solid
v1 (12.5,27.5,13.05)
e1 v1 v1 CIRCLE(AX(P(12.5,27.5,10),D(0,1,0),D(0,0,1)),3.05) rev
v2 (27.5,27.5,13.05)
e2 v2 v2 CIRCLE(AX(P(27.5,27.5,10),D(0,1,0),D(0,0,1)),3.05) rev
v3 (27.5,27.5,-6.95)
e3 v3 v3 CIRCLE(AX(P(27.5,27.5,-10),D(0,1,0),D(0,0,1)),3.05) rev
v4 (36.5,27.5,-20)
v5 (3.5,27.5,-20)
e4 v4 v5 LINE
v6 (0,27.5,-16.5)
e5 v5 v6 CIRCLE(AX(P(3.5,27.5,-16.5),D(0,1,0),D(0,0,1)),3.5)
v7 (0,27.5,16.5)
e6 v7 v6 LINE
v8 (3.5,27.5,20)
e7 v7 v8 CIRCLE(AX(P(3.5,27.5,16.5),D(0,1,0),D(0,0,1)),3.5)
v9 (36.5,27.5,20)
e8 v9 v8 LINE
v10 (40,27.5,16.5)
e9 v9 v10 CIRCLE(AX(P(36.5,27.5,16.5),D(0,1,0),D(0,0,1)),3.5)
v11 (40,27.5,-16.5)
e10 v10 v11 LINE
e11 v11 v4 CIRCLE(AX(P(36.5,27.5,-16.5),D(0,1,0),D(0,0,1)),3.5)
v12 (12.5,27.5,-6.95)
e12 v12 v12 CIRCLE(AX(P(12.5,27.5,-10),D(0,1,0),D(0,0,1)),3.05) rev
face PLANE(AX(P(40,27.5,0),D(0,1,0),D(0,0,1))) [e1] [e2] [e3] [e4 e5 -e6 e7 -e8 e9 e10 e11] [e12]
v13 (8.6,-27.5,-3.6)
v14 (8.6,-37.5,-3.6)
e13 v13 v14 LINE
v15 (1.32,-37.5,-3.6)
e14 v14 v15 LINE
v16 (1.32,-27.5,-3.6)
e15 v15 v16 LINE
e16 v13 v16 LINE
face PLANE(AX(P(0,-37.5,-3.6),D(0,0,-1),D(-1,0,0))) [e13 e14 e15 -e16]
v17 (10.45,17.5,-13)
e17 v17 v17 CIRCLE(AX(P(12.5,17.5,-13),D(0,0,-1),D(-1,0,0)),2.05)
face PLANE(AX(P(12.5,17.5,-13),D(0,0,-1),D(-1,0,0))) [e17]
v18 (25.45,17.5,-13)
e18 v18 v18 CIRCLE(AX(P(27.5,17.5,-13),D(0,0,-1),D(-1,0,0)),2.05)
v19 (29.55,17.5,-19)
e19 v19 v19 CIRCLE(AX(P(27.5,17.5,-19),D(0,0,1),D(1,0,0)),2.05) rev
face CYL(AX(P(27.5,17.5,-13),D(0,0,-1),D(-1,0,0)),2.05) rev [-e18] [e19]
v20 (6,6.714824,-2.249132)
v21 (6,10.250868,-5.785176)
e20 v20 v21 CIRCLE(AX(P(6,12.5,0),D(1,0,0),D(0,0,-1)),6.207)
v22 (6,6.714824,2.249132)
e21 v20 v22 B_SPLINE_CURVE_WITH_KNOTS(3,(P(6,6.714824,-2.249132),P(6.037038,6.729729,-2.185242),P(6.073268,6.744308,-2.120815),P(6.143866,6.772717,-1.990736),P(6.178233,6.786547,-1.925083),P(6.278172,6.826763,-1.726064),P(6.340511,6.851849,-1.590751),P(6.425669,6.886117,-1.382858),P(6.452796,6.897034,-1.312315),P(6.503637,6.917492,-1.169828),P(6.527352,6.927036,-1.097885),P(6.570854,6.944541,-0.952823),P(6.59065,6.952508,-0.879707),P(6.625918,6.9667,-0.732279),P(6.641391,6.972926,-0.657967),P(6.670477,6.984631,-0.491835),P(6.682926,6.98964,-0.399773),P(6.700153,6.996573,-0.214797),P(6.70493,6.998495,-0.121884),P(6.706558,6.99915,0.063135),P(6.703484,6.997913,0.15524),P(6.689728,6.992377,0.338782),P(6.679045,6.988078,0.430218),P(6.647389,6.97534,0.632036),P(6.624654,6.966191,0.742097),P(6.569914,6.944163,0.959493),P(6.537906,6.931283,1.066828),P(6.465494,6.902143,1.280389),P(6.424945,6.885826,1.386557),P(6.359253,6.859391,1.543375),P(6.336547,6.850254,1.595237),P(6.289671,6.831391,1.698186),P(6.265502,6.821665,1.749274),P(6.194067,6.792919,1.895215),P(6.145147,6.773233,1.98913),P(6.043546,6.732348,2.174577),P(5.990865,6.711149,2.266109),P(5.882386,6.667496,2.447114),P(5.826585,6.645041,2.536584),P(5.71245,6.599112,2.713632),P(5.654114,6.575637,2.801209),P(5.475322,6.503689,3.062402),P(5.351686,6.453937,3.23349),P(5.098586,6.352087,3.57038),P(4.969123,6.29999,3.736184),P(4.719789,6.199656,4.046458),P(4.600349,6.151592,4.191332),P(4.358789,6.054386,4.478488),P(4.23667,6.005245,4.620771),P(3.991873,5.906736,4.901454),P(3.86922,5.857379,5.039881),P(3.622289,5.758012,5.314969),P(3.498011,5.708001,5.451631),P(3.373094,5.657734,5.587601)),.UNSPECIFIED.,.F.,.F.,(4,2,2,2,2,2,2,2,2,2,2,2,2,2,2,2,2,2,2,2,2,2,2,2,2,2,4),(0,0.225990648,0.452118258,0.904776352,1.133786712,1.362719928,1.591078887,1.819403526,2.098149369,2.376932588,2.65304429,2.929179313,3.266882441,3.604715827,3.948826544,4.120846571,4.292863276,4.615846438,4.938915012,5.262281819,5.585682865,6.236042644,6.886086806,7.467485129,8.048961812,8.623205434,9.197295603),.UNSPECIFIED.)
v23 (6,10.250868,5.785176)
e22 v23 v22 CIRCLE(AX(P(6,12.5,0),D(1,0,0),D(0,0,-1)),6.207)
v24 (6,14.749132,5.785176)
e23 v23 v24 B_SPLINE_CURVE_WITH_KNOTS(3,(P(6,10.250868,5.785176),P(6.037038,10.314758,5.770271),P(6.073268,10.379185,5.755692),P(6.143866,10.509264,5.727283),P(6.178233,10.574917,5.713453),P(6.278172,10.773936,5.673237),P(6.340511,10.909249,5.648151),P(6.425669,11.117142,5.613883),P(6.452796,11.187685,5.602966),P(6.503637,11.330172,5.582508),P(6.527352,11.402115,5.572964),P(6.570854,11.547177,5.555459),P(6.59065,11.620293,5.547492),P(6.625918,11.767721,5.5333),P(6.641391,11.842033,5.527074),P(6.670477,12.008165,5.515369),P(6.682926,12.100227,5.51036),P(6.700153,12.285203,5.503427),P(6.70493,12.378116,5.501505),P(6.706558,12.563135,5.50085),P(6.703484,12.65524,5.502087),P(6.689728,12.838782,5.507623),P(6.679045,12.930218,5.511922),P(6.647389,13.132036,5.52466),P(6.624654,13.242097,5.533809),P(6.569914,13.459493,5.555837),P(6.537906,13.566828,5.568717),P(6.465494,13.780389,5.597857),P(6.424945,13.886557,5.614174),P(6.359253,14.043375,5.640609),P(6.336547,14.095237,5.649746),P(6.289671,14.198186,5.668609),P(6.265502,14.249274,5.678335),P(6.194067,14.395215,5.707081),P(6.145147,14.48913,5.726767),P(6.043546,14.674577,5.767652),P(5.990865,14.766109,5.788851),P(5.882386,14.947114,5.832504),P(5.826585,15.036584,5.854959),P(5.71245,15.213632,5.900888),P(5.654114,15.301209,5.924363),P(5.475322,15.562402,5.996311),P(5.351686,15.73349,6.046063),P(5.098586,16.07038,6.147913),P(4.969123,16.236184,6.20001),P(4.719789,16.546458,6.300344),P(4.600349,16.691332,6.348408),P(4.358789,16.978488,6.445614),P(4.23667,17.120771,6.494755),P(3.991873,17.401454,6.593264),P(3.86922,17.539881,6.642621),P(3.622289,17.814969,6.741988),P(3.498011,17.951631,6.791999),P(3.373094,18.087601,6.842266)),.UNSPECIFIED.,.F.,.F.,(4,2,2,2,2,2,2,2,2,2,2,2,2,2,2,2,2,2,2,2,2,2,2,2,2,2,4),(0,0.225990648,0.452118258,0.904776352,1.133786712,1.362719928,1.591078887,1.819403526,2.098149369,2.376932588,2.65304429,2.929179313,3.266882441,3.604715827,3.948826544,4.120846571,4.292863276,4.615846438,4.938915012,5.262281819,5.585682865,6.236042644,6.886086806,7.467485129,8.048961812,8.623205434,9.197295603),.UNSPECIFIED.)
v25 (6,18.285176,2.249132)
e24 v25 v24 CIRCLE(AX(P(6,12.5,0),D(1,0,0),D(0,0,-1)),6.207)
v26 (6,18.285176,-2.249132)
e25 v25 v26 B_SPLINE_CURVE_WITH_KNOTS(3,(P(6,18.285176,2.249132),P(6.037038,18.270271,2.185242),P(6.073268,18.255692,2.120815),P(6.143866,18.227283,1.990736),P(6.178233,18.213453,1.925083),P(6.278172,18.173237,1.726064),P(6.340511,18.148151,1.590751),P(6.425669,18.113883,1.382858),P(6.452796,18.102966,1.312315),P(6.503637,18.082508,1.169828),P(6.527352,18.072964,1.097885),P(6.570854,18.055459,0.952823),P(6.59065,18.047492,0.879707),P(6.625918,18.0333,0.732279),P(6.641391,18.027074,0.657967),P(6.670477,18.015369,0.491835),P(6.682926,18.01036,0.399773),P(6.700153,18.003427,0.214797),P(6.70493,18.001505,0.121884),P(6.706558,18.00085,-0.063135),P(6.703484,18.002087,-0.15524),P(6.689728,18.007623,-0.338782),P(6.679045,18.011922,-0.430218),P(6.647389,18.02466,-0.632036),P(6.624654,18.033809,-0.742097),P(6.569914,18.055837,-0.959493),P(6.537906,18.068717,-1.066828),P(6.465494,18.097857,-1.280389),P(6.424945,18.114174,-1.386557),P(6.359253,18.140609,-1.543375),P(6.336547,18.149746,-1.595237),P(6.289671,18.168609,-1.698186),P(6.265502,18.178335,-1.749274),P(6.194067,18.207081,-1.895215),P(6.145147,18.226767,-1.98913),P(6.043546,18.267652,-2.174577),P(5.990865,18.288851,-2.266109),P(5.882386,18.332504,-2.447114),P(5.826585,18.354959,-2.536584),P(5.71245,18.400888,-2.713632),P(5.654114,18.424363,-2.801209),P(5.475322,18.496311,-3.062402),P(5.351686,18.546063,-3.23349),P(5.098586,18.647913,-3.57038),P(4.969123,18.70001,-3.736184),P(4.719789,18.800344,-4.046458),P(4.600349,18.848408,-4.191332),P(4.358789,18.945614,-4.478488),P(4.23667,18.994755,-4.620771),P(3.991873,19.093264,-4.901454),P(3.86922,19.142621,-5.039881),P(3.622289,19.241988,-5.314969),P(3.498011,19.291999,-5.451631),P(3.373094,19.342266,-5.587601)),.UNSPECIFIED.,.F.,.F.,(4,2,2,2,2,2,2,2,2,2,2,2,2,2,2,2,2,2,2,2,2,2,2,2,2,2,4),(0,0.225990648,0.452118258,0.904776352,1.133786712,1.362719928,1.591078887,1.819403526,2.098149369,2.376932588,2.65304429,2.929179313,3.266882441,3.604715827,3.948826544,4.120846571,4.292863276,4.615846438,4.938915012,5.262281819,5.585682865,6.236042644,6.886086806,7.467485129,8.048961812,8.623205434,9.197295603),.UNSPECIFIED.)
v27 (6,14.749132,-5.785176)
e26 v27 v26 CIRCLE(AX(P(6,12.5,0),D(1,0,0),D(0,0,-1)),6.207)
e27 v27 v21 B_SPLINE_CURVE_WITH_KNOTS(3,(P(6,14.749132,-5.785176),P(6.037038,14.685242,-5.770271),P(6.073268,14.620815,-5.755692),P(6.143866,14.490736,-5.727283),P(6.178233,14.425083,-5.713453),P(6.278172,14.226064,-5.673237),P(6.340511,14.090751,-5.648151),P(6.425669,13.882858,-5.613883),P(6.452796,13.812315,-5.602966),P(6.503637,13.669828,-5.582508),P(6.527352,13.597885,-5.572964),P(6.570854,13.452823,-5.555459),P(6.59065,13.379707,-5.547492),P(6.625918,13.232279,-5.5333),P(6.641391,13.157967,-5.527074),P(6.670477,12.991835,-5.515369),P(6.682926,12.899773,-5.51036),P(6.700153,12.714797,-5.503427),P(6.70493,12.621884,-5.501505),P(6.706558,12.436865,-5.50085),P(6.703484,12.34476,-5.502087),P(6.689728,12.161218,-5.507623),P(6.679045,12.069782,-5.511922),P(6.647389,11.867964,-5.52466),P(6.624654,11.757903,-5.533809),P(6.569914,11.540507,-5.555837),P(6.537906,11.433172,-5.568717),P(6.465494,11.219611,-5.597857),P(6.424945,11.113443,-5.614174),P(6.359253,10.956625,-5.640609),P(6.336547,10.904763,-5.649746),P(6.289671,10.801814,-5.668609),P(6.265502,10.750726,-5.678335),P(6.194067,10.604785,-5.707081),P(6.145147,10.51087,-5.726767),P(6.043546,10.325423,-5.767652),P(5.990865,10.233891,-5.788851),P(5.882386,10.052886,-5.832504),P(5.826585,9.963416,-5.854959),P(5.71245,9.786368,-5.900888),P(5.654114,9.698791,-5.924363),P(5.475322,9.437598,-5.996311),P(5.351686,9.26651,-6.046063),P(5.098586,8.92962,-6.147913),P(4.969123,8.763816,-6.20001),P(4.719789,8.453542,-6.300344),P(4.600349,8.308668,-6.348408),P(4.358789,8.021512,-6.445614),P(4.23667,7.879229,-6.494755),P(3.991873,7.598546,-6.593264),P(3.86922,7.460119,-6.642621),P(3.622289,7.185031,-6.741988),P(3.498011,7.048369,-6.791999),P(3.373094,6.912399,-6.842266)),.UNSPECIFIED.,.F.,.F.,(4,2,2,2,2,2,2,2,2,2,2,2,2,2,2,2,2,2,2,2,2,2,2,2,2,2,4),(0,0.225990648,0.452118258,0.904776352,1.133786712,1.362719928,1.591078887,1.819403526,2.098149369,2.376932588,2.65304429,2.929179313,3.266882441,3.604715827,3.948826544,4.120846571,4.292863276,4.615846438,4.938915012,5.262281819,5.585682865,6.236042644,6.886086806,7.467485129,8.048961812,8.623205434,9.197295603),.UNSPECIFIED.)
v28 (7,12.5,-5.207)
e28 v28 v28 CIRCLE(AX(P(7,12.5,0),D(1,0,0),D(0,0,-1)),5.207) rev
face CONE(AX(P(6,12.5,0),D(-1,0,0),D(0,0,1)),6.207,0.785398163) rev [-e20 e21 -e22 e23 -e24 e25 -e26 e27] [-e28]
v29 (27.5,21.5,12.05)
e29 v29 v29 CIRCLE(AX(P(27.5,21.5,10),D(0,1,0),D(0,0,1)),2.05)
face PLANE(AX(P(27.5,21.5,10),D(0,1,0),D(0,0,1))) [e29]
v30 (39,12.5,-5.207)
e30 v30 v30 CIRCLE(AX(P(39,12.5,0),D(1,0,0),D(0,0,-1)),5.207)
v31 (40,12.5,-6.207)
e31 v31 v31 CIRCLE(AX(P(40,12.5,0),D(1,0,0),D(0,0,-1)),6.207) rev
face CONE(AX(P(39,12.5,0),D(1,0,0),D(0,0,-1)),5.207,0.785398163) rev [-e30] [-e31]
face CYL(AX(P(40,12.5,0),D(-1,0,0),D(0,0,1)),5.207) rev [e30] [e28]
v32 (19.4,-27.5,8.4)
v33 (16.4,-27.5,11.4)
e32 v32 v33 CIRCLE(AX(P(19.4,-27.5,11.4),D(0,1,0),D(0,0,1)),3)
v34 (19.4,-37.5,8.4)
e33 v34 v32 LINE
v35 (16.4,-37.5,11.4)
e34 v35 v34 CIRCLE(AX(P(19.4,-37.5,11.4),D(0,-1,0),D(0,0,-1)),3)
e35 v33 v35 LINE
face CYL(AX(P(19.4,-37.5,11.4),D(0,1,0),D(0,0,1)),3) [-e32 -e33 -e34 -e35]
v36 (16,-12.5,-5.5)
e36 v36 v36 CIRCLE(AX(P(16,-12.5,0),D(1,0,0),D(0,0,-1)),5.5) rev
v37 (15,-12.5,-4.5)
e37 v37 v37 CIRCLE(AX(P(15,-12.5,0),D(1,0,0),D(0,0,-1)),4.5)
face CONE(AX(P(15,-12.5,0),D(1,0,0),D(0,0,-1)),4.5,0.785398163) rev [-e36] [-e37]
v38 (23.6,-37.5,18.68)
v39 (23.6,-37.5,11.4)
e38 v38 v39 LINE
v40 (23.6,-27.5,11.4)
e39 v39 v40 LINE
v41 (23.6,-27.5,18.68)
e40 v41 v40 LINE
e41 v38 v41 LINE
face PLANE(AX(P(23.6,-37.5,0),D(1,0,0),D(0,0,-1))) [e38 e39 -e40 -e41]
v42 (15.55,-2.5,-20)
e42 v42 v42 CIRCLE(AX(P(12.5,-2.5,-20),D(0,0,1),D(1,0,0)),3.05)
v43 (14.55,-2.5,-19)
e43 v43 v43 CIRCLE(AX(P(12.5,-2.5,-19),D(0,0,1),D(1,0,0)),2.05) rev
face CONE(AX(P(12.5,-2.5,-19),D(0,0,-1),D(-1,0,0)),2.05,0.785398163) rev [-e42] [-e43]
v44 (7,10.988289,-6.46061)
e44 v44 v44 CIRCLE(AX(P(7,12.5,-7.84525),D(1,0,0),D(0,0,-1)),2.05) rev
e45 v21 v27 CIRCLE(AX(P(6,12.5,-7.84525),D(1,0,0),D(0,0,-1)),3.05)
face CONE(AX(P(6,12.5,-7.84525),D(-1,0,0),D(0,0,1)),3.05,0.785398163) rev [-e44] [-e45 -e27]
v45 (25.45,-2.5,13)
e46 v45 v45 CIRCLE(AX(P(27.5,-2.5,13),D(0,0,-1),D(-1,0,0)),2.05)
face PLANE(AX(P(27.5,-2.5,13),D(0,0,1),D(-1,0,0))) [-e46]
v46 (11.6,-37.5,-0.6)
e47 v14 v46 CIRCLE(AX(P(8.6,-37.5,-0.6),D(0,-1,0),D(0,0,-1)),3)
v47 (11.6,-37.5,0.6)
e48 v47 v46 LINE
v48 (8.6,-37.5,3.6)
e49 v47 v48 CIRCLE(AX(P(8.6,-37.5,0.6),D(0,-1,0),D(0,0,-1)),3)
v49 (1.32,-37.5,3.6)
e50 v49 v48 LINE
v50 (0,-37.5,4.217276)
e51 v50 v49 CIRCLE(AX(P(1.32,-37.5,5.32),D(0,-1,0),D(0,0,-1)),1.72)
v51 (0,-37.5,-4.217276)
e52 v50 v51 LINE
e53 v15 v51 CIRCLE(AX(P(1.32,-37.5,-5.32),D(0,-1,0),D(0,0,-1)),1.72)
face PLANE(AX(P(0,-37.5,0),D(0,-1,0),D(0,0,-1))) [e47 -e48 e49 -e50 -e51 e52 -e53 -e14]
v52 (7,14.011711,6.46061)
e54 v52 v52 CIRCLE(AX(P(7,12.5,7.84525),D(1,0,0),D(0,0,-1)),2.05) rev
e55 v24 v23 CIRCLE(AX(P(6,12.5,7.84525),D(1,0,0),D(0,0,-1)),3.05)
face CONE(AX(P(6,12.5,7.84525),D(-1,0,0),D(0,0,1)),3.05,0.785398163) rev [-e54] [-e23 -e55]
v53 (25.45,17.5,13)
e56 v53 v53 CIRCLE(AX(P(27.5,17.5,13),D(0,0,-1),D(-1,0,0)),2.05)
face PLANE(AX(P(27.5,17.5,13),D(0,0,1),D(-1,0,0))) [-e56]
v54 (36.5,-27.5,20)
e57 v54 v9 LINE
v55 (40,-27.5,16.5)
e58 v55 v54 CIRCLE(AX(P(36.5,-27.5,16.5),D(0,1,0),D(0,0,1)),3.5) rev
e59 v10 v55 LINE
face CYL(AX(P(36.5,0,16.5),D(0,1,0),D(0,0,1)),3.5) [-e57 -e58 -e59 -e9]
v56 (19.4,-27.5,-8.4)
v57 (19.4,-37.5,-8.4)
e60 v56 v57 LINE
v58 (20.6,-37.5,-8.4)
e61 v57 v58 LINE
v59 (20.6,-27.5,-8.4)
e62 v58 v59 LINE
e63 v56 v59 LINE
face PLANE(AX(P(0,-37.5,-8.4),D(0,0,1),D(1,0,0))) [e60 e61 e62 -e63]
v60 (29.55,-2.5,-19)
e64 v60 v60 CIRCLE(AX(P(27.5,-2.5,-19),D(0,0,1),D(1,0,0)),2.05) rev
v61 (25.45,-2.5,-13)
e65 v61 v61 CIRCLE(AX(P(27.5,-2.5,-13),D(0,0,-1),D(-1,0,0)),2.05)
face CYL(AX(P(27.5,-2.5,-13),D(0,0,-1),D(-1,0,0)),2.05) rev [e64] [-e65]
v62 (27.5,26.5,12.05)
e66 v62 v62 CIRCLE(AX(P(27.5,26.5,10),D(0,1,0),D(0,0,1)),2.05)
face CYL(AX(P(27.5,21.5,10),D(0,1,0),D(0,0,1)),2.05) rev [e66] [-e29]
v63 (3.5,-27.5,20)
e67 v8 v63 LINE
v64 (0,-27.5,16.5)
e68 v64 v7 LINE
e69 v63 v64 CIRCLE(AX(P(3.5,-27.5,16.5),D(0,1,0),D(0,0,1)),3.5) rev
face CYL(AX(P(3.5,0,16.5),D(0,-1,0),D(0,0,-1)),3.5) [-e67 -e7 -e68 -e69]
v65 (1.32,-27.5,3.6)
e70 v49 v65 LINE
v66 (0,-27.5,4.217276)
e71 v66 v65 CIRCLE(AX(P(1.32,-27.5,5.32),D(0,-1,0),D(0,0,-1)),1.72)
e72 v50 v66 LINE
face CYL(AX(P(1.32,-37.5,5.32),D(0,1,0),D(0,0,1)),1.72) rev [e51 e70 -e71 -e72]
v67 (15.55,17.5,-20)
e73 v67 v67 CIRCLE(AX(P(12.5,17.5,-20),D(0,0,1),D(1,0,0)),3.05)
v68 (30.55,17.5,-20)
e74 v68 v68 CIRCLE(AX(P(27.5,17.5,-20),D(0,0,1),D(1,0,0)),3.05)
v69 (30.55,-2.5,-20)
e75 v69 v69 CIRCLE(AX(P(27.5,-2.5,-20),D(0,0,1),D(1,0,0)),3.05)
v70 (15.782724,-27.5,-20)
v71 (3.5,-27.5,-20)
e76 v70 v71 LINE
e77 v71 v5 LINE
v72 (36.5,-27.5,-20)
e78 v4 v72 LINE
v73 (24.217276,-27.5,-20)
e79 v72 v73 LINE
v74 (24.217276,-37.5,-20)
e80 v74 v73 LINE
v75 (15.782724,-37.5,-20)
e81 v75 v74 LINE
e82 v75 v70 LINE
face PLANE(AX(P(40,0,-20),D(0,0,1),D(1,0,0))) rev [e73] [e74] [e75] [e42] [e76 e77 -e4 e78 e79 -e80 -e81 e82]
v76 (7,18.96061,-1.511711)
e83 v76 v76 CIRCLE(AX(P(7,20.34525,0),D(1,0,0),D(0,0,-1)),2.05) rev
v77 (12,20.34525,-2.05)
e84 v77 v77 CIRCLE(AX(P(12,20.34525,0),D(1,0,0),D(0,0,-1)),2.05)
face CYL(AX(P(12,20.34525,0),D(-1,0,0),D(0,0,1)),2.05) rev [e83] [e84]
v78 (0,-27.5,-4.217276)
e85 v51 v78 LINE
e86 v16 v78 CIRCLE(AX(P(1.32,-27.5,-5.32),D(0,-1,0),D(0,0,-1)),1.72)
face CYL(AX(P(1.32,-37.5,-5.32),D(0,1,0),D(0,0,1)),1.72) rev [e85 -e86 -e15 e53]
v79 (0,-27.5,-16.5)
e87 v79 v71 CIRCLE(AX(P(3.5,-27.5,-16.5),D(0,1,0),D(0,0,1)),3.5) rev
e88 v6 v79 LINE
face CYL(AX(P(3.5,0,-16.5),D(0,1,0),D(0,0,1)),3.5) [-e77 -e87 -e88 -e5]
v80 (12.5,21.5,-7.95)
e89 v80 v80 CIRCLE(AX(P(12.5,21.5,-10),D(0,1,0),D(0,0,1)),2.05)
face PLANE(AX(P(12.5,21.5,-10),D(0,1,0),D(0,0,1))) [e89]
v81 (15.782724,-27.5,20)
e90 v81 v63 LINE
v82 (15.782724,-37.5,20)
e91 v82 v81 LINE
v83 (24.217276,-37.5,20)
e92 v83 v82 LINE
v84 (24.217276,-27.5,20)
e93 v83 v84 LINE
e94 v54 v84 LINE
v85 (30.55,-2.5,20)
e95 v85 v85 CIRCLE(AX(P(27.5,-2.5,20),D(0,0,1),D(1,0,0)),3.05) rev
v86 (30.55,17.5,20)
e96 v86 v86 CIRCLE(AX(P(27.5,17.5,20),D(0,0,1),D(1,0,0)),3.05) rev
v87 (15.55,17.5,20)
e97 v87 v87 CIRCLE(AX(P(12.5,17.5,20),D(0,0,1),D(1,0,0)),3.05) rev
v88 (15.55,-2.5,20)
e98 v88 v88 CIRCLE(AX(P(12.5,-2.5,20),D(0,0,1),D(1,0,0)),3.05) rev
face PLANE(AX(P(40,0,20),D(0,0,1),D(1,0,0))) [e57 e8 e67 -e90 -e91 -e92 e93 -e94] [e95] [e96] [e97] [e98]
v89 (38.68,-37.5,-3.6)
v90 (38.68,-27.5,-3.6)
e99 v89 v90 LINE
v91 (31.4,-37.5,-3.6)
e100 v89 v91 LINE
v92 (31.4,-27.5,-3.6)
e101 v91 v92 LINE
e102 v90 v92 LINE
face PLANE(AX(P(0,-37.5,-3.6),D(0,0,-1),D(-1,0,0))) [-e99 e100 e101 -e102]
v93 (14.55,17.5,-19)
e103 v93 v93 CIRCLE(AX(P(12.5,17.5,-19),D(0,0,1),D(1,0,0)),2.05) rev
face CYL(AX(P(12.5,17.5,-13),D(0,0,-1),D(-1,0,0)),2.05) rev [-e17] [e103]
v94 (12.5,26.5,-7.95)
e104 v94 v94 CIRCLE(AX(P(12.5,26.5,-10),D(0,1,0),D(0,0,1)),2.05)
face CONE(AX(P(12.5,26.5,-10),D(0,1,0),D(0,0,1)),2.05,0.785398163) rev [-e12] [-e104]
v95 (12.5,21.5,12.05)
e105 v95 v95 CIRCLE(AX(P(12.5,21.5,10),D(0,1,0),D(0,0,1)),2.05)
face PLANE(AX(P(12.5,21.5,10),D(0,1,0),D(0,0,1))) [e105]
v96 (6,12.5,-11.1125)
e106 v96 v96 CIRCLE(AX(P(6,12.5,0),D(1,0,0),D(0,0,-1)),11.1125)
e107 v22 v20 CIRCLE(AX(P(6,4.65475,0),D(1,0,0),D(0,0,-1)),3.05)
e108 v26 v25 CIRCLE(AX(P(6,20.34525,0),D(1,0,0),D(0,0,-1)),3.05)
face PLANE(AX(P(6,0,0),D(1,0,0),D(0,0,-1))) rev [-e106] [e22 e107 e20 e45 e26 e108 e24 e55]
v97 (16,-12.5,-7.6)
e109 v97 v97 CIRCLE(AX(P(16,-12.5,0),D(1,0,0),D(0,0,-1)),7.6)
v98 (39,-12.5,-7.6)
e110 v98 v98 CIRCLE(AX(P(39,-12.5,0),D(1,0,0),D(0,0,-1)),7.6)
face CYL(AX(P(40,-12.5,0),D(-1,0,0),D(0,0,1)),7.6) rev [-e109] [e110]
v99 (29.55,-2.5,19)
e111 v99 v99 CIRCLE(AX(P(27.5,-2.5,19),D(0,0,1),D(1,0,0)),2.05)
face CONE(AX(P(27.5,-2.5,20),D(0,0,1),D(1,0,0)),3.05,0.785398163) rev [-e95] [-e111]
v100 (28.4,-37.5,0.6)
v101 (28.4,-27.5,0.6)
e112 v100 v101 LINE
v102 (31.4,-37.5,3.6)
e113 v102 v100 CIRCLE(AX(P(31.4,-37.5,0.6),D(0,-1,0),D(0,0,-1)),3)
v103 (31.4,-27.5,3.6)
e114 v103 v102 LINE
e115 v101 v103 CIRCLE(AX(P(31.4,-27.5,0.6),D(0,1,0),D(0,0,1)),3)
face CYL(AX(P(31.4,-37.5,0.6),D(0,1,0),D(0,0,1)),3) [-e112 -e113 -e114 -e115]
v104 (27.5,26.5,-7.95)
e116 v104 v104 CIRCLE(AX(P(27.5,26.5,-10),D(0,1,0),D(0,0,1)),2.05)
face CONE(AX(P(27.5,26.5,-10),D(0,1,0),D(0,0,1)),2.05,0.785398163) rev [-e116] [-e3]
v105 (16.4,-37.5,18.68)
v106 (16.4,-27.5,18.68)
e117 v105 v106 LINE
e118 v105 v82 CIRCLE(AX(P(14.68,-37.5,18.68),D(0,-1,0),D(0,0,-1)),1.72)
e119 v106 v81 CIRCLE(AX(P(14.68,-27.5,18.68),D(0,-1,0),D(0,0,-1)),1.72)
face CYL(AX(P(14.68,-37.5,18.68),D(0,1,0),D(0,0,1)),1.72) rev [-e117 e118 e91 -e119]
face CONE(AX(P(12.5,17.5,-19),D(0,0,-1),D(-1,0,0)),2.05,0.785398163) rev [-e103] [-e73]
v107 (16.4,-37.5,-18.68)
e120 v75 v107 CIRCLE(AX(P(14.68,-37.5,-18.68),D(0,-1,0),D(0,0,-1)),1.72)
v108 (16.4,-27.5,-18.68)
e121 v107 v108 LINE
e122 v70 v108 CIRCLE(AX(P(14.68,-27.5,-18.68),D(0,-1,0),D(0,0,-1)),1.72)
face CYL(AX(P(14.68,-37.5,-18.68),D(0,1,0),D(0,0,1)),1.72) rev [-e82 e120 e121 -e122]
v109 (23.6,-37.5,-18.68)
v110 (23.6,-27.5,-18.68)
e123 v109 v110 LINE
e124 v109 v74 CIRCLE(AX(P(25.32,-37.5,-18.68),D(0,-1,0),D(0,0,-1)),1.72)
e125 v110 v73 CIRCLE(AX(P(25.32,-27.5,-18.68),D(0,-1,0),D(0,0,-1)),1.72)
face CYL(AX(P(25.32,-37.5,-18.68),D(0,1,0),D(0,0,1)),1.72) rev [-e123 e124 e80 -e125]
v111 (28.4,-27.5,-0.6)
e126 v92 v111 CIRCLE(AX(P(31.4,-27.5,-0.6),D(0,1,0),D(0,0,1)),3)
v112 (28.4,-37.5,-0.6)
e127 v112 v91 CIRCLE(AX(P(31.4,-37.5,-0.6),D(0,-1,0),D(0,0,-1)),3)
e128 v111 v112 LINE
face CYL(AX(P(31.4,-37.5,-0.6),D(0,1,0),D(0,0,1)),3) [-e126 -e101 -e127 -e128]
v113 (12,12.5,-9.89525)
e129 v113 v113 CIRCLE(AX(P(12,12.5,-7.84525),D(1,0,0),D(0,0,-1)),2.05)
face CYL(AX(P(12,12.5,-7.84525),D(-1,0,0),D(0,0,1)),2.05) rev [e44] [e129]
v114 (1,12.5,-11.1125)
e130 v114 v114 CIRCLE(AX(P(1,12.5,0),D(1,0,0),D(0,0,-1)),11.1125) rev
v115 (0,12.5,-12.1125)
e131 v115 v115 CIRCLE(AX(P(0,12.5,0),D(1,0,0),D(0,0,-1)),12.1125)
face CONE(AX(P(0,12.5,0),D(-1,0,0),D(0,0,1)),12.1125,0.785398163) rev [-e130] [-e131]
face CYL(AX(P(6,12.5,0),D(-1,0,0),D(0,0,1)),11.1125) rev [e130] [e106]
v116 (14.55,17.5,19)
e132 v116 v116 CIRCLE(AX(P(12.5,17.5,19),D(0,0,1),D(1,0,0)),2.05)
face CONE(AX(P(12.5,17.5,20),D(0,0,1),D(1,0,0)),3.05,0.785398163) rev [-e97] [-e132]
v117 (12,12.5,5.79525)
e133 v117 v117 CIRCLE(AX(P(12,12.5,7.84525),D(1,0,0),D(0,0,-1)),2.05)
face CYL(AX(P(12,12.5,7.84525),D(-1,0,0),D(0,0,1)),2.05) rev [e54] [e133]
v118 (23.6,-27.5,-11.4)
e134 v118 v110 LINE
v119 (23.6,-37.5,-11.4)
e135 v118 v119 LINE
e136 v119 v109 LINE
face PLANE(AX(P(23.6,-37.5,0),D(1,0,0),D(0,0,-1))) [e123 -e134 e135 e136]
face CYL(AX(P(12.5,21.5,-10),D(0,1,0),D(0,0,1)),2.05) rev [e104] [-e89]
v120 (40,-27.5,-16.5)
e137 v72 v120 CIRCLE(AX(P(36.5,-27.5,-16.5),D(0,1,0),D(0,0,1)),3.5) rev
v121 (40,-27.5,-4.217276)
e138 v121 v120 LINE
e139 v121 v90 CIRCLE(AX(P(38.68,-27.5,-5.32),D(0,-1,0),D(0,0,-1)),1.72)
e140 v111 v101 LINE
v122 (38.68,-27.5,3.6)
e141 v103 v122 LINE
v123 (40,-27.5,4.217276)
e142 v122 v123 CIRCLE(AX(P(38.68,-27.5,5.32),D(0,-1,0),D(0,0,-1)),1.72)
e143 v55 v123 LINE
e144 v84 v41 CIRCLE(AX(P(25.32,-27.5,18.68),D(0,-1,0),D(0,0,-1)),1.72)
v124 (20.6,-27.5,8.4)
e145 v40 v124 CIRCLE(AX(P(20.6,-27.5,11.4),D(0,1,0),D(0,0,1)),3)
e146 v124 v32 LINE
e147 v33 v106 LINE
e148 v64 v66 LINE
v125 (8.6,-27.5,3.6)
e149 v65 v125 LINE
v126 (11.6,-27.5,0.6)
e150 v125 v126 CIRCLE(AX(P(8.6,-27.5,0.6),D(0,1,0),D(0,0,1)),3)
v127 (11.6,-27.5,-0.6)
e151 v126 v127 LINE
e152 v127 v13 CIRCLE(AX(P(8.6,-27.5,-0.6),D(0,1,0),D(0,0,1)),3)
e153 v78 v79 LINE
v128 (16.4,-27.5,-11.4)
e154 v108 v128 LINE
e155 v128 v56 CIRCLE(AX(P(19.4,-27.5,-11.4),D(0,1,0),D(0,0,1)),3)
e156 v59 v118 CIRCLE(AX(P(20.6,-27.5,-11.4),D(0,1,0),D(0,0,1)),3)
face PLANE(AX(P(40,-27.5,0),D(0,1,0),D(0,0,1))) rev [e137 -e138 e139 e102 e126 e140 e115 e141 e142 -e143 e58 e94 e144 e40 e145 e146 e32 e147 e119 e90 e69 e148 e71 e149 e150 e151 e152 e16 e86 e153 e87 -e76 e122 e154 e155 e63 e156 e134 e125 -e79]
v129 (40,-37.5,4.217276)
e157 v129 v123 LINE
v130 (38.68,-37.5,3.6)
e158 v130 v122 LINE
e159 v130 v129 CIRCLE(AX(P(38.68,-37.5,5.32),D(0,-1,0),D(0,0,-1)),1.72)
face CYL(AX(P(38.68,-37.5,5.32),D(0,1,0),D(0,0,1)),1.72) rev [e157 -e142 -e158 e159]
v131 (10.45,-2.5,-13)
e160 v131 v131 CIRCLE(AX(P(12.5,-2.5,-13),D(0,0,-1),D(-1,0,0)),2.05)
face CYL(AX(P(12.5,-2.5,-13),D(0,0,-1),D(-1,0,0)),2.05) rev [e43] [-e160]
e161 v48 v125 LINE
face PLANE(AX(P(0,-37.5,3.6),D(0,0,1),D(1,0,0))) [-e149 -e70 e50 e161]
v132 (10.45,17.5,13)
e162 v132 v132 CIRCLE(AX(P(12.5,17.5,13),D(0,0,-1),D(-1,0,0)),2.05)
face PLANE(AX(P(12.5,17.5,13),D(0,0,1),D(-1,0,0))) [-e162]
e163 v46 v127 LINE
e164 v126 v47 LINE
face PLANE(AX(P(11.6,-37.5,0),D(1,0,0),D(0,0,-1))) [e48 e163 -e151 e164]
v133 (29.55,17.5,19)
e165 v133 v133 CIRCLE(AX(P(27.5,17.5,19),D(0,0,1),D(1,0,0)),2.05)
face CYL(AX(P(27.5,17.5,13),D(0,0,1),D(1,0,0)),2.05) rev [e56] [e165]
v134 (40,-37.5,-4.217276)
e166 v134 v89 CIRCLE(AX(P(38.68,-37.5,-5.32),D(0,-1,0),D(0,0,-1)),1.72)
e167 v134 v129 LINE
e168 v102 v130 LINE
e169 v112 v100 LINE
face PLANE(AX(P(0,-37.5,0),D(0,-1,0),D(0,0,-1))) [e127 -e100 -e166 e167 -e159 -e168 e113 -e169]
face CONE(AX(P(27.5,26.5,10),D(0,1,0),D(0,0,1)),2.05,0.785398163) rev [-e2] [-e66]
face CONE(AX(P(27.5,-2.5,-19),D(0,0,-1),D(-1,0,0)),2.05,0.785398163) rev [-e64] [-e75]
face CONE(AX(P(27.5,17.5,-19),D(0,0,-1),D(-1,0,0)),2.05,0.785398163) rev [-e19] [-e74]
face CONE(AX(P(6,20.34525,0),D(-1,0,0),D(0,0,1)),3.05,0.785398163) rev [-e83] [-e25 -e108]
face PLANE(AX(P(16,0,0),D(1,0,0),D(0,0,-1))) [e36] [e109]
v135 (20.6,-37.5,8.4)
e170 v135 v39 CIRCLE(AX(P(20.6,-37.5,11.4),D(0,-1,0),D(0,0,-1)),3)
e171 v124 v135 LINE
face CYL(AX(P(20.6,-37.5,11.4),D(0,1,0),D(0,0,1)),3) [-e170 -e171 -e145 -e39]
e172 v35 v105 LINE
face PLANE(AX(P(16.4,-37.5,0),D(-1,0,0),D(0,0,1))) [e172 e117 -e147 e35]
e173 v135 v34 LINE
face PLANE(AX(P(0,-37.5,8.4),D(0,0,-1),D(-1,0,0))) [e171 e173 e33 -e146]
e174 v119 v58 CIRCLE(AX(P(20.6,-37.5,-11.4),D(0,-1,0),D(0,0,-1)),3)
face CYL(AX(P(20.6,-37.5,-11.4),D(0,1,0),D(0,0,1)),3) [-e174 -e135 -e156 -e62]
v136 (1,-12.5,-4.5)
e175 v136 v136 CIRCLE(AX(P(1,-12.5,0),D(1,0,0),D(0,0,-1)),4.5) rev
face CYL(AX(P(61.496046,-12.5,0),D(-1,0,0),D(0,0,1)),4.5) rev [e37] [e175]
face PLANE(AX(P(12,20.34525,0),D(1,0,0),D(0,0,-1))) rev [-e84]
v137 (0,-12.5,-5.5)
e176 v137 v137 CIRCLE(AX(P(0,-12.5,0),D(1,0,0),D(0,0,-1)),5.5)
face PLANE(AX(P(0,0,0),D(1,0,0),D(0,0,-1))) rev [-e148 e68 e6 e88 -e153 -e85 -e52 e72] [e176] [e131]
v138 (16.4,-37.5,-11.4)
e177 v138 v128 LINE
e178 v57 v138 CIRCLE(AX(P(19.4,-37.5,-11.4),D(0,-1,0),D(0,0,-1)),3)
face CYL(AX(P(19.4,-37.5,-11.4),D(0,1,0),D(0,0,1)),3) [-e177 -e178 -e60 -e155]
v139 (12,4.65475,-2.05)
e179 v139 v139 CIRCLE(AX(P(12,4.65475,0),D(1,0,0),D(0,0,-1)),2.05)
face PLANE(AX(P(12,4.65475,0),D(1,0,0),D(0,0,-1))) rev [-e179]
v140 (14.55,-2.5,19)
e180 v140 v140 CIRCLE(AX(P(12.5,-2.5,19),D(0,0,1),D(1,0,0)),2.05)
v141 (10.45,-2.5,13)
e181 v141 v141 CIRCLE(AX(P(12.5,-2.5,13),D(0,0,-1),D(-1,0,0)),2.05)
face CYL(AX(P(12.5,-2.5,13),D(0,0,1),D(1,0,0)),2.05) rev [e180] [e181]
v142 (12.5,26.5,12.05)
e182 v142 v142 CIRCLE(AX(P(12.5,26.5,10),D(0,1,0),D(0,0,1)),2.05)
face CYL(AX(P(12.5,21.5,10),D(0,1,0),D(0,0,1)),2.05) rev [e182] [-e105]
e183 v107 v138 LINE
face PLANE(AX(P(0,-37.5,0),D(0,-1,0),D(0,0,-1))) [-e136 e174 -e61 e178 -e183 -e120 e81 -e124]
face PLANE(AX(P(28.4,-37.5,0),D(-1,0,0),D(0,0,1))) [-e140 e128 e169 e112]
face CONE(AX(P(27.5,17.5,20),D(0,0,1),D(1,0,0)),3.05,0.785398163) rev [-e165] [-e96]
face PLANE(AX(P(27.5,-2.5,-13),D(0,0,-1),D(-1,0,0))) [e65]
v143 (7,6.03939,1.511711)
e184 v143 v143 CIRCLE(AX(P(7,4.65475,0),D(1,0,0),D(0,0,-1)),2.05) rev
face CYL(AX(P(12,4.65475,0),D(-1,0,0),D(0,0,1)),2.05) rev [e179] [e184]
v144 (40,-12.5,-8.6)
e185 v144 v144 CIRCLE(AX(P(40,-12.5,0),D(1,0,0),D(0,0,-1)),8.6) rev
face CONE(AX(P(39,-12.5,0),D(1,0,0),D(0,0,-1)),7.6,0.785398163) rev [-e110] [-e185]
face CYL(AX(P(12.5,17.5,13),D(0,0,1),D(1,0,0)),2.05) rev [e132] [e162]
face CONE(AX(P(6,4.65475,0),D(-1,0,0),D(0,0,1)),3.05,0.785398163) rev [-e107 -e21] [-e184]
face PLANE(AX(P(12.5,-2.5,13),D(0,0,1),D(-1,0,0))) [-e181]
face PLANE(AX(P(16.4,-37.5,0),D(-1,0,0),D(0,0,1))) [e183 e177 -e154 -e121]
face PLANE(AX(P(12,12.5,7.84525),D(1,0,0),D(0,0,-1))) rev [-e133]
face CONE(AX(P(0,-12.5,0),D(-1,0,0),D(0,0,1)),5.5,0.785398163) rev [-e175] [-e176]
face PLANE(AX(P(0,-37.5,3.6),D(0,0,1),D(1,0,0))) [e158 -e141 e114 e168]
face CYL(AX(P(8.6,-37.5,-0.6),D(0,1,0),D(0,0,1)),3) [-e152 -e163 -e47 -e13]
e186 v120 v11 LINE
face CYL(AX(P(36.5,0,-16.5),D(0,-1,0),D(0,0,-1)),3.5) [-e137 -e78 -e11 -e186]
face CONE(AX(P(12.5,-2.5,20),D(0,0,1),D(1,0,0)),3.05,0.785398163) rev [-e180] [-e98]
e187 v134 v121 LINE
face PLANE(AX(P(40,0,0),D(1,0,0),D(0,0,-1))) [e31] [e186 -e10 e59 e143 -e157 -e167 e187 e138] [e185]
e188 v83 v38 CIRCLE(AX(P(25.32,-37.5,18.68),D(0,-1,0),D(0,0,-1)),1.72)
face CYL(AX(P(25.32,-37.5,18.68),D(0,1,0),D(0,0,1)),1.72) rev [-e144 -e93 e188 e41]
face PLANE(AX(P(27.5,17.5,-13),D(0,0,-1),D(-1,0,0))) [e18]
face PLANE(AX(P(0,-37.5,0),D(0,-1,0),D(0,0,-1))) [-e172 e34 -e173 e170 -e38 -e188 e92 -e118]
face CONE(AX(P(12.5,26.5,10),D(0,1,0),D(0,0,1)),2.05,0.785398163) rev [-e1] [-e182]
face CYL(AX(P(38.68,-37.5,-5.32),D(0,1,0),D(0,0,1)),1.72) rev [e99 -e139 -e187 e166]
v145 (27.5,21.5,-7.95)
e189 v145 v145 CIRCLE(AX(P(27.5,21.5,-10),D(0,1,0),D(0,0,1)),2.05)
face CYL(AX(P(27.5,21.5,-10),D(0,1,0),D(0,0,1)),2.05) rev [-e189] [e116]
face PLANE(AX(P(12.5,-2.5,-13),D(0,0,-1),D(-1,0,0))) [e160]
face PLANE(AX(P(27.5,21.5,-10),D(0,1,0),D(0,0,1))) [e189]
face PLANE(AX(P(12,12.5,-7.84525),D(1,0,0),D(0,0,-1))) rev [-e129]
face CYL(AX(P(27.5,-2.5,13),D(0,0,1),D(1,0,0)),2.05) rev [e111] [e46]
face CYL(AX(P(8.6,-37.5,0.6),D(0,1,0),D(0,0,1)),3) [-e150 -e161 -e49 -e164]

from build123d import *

# Parameters (mm, degrees)
SKETCH1_W           = 40
SKETCH1_H           = 55
SKETCH1_R           = 5.207
SKETCH1_R_2         = 7.6
BOSS_EXTRUDE1_DEPTH = 40
SKETCH1_3_R         = 11.1125
SKETCH1_3_R_2       = 5.207
CUT_EXTRUDE1_DEPTH  = 6
BOSS_EXTRUDE3_DEPTH = 16
CHAMFER1_SIZE       = 1
CUT_EXTRUDE2_START  = 6
SKETCH2_R           = 2.05
CUT_EXTRUDE2_DEPTH  = 6
SKETCH3_R           = 2.05
CUT_EXTRUDE3_DEPTH  = 6
SKETCH6_R           = 2.05
CUT_EXTRUDE5_DEPTH  = 7
FILLET2_R           = 3.5
BOSS_EXTRUDE2_DEPTH = 10
CHAMFER4_SIZE       = 1
FILLET3_R           = 3


with BuildPart() as part:
    # Sketch1 → Boss-Extrude1 (new body)
    with BuildSketch(Plane(origin=(0, 0, 0), x_dir=(0, 0, -1), z_dir=(1, 0, 0))):
        Rectangle(SKETCH1_W, SKETCH1_H)
        with Locations((0, 12.5)):
            Circle(SKETCH1_R, mode=Mode.SUBTRACT)
        with Locations((0, -12.5)):
            Circle(SKETCH1_R_2, mode=Mode.SUBTRACT)
    extrude(amount=BOSS_EXTRUDE1_DEPTH)

    # Sketch1<3> → Cut-Extrude1 (cut)
    with BuildSketch(Plane(origin=(0, 0, 0), x_dir=(0, 0, -1), z_dir=(1, 0, 0))):
        with Locations((0, 12.5)):
            Circle(SKETCH1_3_R)
        with Locations((0, 12.5)):
            Circle(SKETCH1_3_R_2, mode=Mode.SUBTRACT)
    extrude(amount=CUT_EXTRUDE1_DEPTH, mode=Mode.SUBTRACT)

    # Sketch1<4> → Boss-Extrude3 (add)
    with BuildSketch(Plane(origin=(0, 0, 0), x_dir=(0, 0, -1), z_dir=(1, 0, 0))):
        with BuildLine():
            ThreePointArc((7.6, -12.5), (5.374011537, -7.125988463), (0, -4.9))
            ThreePointArc((0, -4.9), (-5.374011537, -17.874011537), (7.6, -12.5))
        make_face()
        with BuildLine():
            ThreePointArc((4.5, -12.5), (-3.181980515, -15.681980515), (0, -8))
            ThreePointArc((0, -8), (3.181980515, -9.318019485), (4.5, -12.5))
        make_face(mode=Mode.SUBTRACT)
    extrude(amount=BOSS_EXTRUDE3_DEPTH)

    # Chamfer1
    chamfer1_edges = [part.edges().sort_by_distance(p)[0] for p in [
        (6, 12.5, 5.207),
        (0, 12.5, 11.1125),
        (40, 12.5, 5.207),
        (40, -12.5, 7.6),
    ]]
    chamfer(chamfer1_edges, length=CHAMFER1_SIZE)

    # Sketch2 → Cut-Extrude2 (cut)
    with BuildSketch(Plane(origin=(0, 0, 0), x_dir=(0, 0, -1), z_dir=(1, 0, 0)).offset(CUT_EXTRUDE2_START)):
        with Locations(Location((0, 4.65475, 0), (0, 0, 122.182106199))):
            Circle(SKETCH2_R)
        with Locations(Location((-7.84525, 12.5, 0), (0, 0, 327.817891972))):
            Circle(SKETCH2_R)
        with Locations(Location((0, 20.34525, 0), (0, 0, 237.817891972))):
            Circle(SKETCH2_R)
        with Locations(Location((7.84525, 12.5, 0), (0, 0, 212.182106199))):
            Circle(SKETCH2_R)
    extrude(amount=CUT_EXTRUDE2_DEPTH, mode=Mode.SUBTRACT)

    # Sketch3 → Cut-Extrude3 (cut)
    with BuildSketch(Plane(origin=(0, 27.5, 0), x_dir=(1, 0, 0), z_dir=(0, 1, 0))):
        with Locations(Location((12.5, 10, 0), (0, 0, 270))):
            Circle(SKETCH3_R)
        with Locations(Location((27.5, 10, 0), (0, 0, 270))):
            Circle(SKETCH3_R)
        with Locations(Location((12.5, -10, 0), (0, 0, 270))):
            Circle(SKETCH3_R)
        with Locations(Location((27.5, -10, 0), (0, 0, 270))):
            Circle(SKETCH3_R)
    extrude(amount=-CUT_EXTRUDE3_DEPTH, mode=Mode.SUBTRACT)

    # Sketch6 → Cut-Extrude5 (cut)
    with BuildSketch(Plane(origin=(0, 0, -20), x_dir=(-1, 0, 0), z_dir=(0, 0, -1))):
        with Locations((-27.5, 17.5)):
            Circle(SKETCH6_R)
        with Locations((-12.5, 17.5)):
            Circle(SKETCH6_R)
        with Locations((-27.5, -2.5)):
            Circle(SKETCH6_R)
        with Locations((-12.5, -2.5)):
            Circle(SKETCH6_R)
    cut_extrude5 = extrude(amount=-CUT_EXTRUDE5_DEPTH, mode=Mode.SUBTRACT)

    # Mirror1: Cut-Extrude5 across plane
    add(cut_extrude5.mirror(Plane.XY), mode=Mode.SUBTRACT)

    # Chamfer3: read off the stored shape, not the designer's step
    # Chamfer3: loft between two sections, ruled curve by curve
    chamfer3_from = [
        Edge.make_three_point_arc((15, -12.5, -4.5), (15, -8, 0), (15, -12.5, 4.5)),
        Edge.make_three_point_arc((15, -12.5, 4.5), (15, -17, 0), (15, -12.5, -4.5)),
    ]
    chamfer3_to = [
        Edge.make_three_point_arc((16, -12.5, -5.5), (16, -7, 0), (16, -12.5, 5.5)),
        Edge.make_three_point_arc((16, -12.5, 5.5), (16, -18, 0), (16, -12.5, -5.5)),
    ]
    chamfer3 = Solid(Shell([*[Face.make_surface_from_curves(chamfer3_from[k], chamfer3_to[k]) for k in range(2)], Face(Wire(chamfer3_from)), Face(Wire(chamfer3_to))]))
    add(chamfer3, mode=Mode.SUBTRACT)

    # Chamfer3 2: loft between two sections, ruled curve by curve
    chamfer3_2_from = [
        Edge.make_three_point_arc((1, -12.5, -4.5), (1, -17, 0), (1, -12.5, 4.5)),
        Edge.make_three_point_arc((1, -12.5, 4.5), (1, -8, 0), (1, -12.5, -4.5)),
    ]
    chamfer3_2_to = [
        Edge.make_three_point_arc((0, -12.5, -5.5), (0, -18, 0), (0, -12.5, 5.5)),
        Edge.make_three_point_arc((0, -12.5, 5.5), (0, -7, 0), (0, -12.5, -5.5)),
    ]
    chamfer3_2 = Solid(Shell([*[Face.make_surface_from_curves(chamfer3_2_from[k], chamfer3_2_to[k]) for k in range(2)], Face(Wire(chamfer3_2_from)), Face(Wire(chamfer3_2_to))]))
    add(chamfer3_2, mode=Mode.SUBTRACT)

    # Chamfer3 3: loft between two sections, ruled curve by curve
    chamfer3_3_from = [
        Edge.make_three_point_arc((7, 14.011711483, 6.460609833), (7, 11.115359819, 6.33353853), (7, 10.988288542, 9.229890194)),
        Edge.make_three_point_arc((7, 10.988288542, 9.229890194), (7, 13.884640208, 9.356961446), (7, 14.011711483, 6.460609833)),
    ]
    chamfer3_3_to = [
        Edge.make_three_point_arc((6, 14.749131718, 5.785175605), (6, 10.439925585, 5.5961183), (6, 10.250868319, 9.905324435)),
        Edge.make_three_point_arc((6, 10.250868319, 9.905324435), (6, 14.560074456, 10.094381663), (6, 14.749131718, 5.785175605)),
    ]
    chamfer3_3 = Solid(Shell([*[Face.make_surface_from_curves(chamfer3_3_from[k], chamfer3_3_to[k]) for k in range(2)], Face(Wire(chamfer3_3_from)), Face(Wire(chamfer3_3_to))]))
    add(chamfer3_3, mode=Mode.SUBTRACT)

    # Chamfer3 4: loft between two sections, ruled curve by curve
    chamfer3_4_from = [
        Edge.make_three_point_arc((7, 18.960609833, -1.511711483), (7, 18.83353853, 1.384640181), (7, 21.729890194, 1.511711458)),
        Edge.make_three_point_arc((7, 21.729890194, 1.511711458), (7, 21.856961446, -1.384640208), (7, 18.960609833, -1.511711483)),
    ]
    chamfer3_4_to = [
        Edge.make_three_point_arc((6, 18.285175605, -2.249131718), (6, 18.0961183, 2.060074415), (6, 22.405324435, 2.249131681)),
        Edge.make_three_point_arc((6, 22.405324435, 2.249131681), (6, 22.594381663, -2.060074456), (6, 18.285175605, -2.249131718)),
    ]
    chamfer3_4 = Solid(Shell([*[Face.make_surface_from_curves(chamfer3_4_from[k], chamfer3_4_to[k]) for k in range(2)], Face(Wire(chamfer3_4_from)), Face(Wire(chamfer3_4_to))]))
    add(chamfer3_4, mode=Mode.SUBTRACT)

    # Chamfer3 5: loft between two sections, ruled curve by curve
    chamfer3_5_from = [
        Edge.make_three_point_arc((7, 10.988288517, -6.460609833), (7, 13.884640181, -6.33353853), (7, 14.011711458, -9.229890194)),
        Edge.make_three_point_arc((7, 14.011711458, -9.229890194), (7, 11.115359792, -9.356961446), (7, 10.988288517, -6.460609833)),
    ]
    chamfer3_5_to = [
        Edge.make_three_point_arc((6, 10.250868282, -5.785175605), (6, 14.560074415, -5.5961183), (6, 14.749131681, -9.905324435)),
        Edge.make_three_point_arc((6, 14.749131681, -9.905324435), (6, 10.439925544, -10.094381663), (6, 10.250868282, -5.785175605)),
    ]
    chamfer3_5 = Solid(Shell([*[Face.make_surface_from_curves(chamfer3_5_from[k], chamfer3_5_to[k]) for k in range(2)], Face(Wire(chamfer3_5_from)), Face(Wire(chamfer3_5_to))]))
    add(chamfer3_5, mode=Mode.SUBTRACT)

    # Chamfer3 6: loft between two sections, ruled curve by curve
    chamfer3_6_from = [
        Edge.make_three_point_arc((7, 6.039390167, 1.511711483), (7, 6.16646147, -1.384640181), (7, 3.270109806, -1.511711458)),
        Edge.make_three_point_arc((7, 3.270109806, -1.511711458), (7, 3.143038554, 1.384640208), (7, 6.039390167, 1.511711483)),
    ]
    chamfer3_6_to = [
        Edge.make_three_point_arc((6, 6.714824395, 2.249131718), (6, 6.9038817, -2.060074415), (6, 2.594675565, -2.249131681)),
        Edge.make_three_point_arc((6, 2.594675565, -2.249131681), (6, 2.405618337, 2.060074456), (6, 6.714824395, 2.249131718)),
    ]
    chamfer3_6 = Solid(Shell([*[Face.make_surface_from_curves(chamfer3_6_from[k], chamfer3_6_to[k]) for k in range(2)], Face(Wire(chamfer3_6_from)), Face(Wire(chamfer3_6_to))]))
    add(chamfer3_6, mode=Mode.SUBTRACT)

    # Fillet2
    fillet2_edges = [part.edges().sort_by_distance(p)[0] for p in [
        (40, 0, -20),
        (40, 0, 20),
        (0, 0, 20),
        (0, 0, -20),
    ]]
    fillet(fillet2_edges, radius=FILLET2_R)

    # Sketch5 → Boss-Extrude2 (add)
    with BuildSketch(Plane.XZ.offset(27.5)):
        with BuildLine():
            Line((16.4, 18.68), (16.4, 8.4))
            Line((16.4, 8.4), (23.6, 8.4))
            Line((23.6, 8.4), (23.6, 18.68))
            ThreePointArc((23.6, 18.68), (23.761942699, 19.408599647), (24.2172761, 20))
            Line((24.2172761, 20), (15.7827239, 20))
            ThreePointArc((15.7827239, 20), (16.238057301, 19.408599647), (16.4, 18.68))
        make_face()
        with BuildLine():
            ThreePointArc((1.32, 3.6), (0.591400353, 3.761942699), (0, 4.2172761))
            Line((0, 4.2172761), (0, -4.2172761))
            ThreePointArc((0, -4.2172761), (0.591400353, -3.761942699), (1.32, -3.6))
            Line((1.32, -3.6), (11.6, -3.6))
            Line((11.6, -3.6), (11.6, 3.6))
            Line((11.6, 3.6), (1.32, 3.6))
        make_face()
        with BuildLine():
            Line((40, -4.2172761), (40, 4.2172761))
            ThreePointArc((40, 4.2172761), (39.408599647, 3.761942699), (38.68, 3.6))
            Line((38.68, 3.6), (28.4, 3.6))
            Line((28.4, 3.6), (28.4, -3.6))
            Line((28.4, -3.6), (38.68, -3.6))
            ThreePointArc((38.68, -3.6), (39.408599647, -3.761942699), (40, -4.2172761))
        make_face()
        with BuildLine():
            ThreePointArc((16.4, -18.68), (16.238057301, -19.408599647), (15.7827239, -20))
            Line((15.7827239, -20), (24.2172761, -20))
            ThreePointArc((24.2172761, -20), (23.761942699, -19.408599647), (23.6, -18.68))
            Line((23.6, -18.68), (23.6, -8.4))
            Line((23.6, -8.4), (16.4, -8.4))
            Line((16.4, -8.4), (16.4, -18.68))
        make_face()
    extrude(amount=BOSS_EXTRUDE2_DEPTH)

    # Chamfer4
    chamfer4_edges = [part.edges().sort_by_distance(p)[0] for p in [
        (29.55, -2.5, -20),
        (14.55, -2.5, -20),
        (29.55, 17.5, -20),
        (14.55, 17.5, 20),
        (29.55, -2.5, 20),
        (14.55, -2.5, 20),
        (29.55, 17.5, 20),
        (27.5, 27.5, -12.05),
        (12.5, 27.5, 7.95),
        (27.5, 27.5, 7.95),
        (12.5, 27.5, -12.05),
        (14.55, 17.5, -20),
    ]]
    chamfer(chamfer4_edges, length=CHAMFER4_SIZE)

    # Fillet3
    fillet3_edges = [part.edges().sort_by_distance(p)[0] for p in [
        (16.4, -32.5, 8.4),
        (23.6, -32.5, 8.4),
        (11.6, -32.5, -3.6),
        (11.6, -32.5, 3.6),
        (28.4, -32.5, 3.6),
        (28.4, -32.5, -3.6),
        (23.6, -32.5, -8.4),
        (16.4, -32.5, -8.4),
    ]]
    fillet(fillet3_edges, radius=FILLET3_R)


solid = part.part
